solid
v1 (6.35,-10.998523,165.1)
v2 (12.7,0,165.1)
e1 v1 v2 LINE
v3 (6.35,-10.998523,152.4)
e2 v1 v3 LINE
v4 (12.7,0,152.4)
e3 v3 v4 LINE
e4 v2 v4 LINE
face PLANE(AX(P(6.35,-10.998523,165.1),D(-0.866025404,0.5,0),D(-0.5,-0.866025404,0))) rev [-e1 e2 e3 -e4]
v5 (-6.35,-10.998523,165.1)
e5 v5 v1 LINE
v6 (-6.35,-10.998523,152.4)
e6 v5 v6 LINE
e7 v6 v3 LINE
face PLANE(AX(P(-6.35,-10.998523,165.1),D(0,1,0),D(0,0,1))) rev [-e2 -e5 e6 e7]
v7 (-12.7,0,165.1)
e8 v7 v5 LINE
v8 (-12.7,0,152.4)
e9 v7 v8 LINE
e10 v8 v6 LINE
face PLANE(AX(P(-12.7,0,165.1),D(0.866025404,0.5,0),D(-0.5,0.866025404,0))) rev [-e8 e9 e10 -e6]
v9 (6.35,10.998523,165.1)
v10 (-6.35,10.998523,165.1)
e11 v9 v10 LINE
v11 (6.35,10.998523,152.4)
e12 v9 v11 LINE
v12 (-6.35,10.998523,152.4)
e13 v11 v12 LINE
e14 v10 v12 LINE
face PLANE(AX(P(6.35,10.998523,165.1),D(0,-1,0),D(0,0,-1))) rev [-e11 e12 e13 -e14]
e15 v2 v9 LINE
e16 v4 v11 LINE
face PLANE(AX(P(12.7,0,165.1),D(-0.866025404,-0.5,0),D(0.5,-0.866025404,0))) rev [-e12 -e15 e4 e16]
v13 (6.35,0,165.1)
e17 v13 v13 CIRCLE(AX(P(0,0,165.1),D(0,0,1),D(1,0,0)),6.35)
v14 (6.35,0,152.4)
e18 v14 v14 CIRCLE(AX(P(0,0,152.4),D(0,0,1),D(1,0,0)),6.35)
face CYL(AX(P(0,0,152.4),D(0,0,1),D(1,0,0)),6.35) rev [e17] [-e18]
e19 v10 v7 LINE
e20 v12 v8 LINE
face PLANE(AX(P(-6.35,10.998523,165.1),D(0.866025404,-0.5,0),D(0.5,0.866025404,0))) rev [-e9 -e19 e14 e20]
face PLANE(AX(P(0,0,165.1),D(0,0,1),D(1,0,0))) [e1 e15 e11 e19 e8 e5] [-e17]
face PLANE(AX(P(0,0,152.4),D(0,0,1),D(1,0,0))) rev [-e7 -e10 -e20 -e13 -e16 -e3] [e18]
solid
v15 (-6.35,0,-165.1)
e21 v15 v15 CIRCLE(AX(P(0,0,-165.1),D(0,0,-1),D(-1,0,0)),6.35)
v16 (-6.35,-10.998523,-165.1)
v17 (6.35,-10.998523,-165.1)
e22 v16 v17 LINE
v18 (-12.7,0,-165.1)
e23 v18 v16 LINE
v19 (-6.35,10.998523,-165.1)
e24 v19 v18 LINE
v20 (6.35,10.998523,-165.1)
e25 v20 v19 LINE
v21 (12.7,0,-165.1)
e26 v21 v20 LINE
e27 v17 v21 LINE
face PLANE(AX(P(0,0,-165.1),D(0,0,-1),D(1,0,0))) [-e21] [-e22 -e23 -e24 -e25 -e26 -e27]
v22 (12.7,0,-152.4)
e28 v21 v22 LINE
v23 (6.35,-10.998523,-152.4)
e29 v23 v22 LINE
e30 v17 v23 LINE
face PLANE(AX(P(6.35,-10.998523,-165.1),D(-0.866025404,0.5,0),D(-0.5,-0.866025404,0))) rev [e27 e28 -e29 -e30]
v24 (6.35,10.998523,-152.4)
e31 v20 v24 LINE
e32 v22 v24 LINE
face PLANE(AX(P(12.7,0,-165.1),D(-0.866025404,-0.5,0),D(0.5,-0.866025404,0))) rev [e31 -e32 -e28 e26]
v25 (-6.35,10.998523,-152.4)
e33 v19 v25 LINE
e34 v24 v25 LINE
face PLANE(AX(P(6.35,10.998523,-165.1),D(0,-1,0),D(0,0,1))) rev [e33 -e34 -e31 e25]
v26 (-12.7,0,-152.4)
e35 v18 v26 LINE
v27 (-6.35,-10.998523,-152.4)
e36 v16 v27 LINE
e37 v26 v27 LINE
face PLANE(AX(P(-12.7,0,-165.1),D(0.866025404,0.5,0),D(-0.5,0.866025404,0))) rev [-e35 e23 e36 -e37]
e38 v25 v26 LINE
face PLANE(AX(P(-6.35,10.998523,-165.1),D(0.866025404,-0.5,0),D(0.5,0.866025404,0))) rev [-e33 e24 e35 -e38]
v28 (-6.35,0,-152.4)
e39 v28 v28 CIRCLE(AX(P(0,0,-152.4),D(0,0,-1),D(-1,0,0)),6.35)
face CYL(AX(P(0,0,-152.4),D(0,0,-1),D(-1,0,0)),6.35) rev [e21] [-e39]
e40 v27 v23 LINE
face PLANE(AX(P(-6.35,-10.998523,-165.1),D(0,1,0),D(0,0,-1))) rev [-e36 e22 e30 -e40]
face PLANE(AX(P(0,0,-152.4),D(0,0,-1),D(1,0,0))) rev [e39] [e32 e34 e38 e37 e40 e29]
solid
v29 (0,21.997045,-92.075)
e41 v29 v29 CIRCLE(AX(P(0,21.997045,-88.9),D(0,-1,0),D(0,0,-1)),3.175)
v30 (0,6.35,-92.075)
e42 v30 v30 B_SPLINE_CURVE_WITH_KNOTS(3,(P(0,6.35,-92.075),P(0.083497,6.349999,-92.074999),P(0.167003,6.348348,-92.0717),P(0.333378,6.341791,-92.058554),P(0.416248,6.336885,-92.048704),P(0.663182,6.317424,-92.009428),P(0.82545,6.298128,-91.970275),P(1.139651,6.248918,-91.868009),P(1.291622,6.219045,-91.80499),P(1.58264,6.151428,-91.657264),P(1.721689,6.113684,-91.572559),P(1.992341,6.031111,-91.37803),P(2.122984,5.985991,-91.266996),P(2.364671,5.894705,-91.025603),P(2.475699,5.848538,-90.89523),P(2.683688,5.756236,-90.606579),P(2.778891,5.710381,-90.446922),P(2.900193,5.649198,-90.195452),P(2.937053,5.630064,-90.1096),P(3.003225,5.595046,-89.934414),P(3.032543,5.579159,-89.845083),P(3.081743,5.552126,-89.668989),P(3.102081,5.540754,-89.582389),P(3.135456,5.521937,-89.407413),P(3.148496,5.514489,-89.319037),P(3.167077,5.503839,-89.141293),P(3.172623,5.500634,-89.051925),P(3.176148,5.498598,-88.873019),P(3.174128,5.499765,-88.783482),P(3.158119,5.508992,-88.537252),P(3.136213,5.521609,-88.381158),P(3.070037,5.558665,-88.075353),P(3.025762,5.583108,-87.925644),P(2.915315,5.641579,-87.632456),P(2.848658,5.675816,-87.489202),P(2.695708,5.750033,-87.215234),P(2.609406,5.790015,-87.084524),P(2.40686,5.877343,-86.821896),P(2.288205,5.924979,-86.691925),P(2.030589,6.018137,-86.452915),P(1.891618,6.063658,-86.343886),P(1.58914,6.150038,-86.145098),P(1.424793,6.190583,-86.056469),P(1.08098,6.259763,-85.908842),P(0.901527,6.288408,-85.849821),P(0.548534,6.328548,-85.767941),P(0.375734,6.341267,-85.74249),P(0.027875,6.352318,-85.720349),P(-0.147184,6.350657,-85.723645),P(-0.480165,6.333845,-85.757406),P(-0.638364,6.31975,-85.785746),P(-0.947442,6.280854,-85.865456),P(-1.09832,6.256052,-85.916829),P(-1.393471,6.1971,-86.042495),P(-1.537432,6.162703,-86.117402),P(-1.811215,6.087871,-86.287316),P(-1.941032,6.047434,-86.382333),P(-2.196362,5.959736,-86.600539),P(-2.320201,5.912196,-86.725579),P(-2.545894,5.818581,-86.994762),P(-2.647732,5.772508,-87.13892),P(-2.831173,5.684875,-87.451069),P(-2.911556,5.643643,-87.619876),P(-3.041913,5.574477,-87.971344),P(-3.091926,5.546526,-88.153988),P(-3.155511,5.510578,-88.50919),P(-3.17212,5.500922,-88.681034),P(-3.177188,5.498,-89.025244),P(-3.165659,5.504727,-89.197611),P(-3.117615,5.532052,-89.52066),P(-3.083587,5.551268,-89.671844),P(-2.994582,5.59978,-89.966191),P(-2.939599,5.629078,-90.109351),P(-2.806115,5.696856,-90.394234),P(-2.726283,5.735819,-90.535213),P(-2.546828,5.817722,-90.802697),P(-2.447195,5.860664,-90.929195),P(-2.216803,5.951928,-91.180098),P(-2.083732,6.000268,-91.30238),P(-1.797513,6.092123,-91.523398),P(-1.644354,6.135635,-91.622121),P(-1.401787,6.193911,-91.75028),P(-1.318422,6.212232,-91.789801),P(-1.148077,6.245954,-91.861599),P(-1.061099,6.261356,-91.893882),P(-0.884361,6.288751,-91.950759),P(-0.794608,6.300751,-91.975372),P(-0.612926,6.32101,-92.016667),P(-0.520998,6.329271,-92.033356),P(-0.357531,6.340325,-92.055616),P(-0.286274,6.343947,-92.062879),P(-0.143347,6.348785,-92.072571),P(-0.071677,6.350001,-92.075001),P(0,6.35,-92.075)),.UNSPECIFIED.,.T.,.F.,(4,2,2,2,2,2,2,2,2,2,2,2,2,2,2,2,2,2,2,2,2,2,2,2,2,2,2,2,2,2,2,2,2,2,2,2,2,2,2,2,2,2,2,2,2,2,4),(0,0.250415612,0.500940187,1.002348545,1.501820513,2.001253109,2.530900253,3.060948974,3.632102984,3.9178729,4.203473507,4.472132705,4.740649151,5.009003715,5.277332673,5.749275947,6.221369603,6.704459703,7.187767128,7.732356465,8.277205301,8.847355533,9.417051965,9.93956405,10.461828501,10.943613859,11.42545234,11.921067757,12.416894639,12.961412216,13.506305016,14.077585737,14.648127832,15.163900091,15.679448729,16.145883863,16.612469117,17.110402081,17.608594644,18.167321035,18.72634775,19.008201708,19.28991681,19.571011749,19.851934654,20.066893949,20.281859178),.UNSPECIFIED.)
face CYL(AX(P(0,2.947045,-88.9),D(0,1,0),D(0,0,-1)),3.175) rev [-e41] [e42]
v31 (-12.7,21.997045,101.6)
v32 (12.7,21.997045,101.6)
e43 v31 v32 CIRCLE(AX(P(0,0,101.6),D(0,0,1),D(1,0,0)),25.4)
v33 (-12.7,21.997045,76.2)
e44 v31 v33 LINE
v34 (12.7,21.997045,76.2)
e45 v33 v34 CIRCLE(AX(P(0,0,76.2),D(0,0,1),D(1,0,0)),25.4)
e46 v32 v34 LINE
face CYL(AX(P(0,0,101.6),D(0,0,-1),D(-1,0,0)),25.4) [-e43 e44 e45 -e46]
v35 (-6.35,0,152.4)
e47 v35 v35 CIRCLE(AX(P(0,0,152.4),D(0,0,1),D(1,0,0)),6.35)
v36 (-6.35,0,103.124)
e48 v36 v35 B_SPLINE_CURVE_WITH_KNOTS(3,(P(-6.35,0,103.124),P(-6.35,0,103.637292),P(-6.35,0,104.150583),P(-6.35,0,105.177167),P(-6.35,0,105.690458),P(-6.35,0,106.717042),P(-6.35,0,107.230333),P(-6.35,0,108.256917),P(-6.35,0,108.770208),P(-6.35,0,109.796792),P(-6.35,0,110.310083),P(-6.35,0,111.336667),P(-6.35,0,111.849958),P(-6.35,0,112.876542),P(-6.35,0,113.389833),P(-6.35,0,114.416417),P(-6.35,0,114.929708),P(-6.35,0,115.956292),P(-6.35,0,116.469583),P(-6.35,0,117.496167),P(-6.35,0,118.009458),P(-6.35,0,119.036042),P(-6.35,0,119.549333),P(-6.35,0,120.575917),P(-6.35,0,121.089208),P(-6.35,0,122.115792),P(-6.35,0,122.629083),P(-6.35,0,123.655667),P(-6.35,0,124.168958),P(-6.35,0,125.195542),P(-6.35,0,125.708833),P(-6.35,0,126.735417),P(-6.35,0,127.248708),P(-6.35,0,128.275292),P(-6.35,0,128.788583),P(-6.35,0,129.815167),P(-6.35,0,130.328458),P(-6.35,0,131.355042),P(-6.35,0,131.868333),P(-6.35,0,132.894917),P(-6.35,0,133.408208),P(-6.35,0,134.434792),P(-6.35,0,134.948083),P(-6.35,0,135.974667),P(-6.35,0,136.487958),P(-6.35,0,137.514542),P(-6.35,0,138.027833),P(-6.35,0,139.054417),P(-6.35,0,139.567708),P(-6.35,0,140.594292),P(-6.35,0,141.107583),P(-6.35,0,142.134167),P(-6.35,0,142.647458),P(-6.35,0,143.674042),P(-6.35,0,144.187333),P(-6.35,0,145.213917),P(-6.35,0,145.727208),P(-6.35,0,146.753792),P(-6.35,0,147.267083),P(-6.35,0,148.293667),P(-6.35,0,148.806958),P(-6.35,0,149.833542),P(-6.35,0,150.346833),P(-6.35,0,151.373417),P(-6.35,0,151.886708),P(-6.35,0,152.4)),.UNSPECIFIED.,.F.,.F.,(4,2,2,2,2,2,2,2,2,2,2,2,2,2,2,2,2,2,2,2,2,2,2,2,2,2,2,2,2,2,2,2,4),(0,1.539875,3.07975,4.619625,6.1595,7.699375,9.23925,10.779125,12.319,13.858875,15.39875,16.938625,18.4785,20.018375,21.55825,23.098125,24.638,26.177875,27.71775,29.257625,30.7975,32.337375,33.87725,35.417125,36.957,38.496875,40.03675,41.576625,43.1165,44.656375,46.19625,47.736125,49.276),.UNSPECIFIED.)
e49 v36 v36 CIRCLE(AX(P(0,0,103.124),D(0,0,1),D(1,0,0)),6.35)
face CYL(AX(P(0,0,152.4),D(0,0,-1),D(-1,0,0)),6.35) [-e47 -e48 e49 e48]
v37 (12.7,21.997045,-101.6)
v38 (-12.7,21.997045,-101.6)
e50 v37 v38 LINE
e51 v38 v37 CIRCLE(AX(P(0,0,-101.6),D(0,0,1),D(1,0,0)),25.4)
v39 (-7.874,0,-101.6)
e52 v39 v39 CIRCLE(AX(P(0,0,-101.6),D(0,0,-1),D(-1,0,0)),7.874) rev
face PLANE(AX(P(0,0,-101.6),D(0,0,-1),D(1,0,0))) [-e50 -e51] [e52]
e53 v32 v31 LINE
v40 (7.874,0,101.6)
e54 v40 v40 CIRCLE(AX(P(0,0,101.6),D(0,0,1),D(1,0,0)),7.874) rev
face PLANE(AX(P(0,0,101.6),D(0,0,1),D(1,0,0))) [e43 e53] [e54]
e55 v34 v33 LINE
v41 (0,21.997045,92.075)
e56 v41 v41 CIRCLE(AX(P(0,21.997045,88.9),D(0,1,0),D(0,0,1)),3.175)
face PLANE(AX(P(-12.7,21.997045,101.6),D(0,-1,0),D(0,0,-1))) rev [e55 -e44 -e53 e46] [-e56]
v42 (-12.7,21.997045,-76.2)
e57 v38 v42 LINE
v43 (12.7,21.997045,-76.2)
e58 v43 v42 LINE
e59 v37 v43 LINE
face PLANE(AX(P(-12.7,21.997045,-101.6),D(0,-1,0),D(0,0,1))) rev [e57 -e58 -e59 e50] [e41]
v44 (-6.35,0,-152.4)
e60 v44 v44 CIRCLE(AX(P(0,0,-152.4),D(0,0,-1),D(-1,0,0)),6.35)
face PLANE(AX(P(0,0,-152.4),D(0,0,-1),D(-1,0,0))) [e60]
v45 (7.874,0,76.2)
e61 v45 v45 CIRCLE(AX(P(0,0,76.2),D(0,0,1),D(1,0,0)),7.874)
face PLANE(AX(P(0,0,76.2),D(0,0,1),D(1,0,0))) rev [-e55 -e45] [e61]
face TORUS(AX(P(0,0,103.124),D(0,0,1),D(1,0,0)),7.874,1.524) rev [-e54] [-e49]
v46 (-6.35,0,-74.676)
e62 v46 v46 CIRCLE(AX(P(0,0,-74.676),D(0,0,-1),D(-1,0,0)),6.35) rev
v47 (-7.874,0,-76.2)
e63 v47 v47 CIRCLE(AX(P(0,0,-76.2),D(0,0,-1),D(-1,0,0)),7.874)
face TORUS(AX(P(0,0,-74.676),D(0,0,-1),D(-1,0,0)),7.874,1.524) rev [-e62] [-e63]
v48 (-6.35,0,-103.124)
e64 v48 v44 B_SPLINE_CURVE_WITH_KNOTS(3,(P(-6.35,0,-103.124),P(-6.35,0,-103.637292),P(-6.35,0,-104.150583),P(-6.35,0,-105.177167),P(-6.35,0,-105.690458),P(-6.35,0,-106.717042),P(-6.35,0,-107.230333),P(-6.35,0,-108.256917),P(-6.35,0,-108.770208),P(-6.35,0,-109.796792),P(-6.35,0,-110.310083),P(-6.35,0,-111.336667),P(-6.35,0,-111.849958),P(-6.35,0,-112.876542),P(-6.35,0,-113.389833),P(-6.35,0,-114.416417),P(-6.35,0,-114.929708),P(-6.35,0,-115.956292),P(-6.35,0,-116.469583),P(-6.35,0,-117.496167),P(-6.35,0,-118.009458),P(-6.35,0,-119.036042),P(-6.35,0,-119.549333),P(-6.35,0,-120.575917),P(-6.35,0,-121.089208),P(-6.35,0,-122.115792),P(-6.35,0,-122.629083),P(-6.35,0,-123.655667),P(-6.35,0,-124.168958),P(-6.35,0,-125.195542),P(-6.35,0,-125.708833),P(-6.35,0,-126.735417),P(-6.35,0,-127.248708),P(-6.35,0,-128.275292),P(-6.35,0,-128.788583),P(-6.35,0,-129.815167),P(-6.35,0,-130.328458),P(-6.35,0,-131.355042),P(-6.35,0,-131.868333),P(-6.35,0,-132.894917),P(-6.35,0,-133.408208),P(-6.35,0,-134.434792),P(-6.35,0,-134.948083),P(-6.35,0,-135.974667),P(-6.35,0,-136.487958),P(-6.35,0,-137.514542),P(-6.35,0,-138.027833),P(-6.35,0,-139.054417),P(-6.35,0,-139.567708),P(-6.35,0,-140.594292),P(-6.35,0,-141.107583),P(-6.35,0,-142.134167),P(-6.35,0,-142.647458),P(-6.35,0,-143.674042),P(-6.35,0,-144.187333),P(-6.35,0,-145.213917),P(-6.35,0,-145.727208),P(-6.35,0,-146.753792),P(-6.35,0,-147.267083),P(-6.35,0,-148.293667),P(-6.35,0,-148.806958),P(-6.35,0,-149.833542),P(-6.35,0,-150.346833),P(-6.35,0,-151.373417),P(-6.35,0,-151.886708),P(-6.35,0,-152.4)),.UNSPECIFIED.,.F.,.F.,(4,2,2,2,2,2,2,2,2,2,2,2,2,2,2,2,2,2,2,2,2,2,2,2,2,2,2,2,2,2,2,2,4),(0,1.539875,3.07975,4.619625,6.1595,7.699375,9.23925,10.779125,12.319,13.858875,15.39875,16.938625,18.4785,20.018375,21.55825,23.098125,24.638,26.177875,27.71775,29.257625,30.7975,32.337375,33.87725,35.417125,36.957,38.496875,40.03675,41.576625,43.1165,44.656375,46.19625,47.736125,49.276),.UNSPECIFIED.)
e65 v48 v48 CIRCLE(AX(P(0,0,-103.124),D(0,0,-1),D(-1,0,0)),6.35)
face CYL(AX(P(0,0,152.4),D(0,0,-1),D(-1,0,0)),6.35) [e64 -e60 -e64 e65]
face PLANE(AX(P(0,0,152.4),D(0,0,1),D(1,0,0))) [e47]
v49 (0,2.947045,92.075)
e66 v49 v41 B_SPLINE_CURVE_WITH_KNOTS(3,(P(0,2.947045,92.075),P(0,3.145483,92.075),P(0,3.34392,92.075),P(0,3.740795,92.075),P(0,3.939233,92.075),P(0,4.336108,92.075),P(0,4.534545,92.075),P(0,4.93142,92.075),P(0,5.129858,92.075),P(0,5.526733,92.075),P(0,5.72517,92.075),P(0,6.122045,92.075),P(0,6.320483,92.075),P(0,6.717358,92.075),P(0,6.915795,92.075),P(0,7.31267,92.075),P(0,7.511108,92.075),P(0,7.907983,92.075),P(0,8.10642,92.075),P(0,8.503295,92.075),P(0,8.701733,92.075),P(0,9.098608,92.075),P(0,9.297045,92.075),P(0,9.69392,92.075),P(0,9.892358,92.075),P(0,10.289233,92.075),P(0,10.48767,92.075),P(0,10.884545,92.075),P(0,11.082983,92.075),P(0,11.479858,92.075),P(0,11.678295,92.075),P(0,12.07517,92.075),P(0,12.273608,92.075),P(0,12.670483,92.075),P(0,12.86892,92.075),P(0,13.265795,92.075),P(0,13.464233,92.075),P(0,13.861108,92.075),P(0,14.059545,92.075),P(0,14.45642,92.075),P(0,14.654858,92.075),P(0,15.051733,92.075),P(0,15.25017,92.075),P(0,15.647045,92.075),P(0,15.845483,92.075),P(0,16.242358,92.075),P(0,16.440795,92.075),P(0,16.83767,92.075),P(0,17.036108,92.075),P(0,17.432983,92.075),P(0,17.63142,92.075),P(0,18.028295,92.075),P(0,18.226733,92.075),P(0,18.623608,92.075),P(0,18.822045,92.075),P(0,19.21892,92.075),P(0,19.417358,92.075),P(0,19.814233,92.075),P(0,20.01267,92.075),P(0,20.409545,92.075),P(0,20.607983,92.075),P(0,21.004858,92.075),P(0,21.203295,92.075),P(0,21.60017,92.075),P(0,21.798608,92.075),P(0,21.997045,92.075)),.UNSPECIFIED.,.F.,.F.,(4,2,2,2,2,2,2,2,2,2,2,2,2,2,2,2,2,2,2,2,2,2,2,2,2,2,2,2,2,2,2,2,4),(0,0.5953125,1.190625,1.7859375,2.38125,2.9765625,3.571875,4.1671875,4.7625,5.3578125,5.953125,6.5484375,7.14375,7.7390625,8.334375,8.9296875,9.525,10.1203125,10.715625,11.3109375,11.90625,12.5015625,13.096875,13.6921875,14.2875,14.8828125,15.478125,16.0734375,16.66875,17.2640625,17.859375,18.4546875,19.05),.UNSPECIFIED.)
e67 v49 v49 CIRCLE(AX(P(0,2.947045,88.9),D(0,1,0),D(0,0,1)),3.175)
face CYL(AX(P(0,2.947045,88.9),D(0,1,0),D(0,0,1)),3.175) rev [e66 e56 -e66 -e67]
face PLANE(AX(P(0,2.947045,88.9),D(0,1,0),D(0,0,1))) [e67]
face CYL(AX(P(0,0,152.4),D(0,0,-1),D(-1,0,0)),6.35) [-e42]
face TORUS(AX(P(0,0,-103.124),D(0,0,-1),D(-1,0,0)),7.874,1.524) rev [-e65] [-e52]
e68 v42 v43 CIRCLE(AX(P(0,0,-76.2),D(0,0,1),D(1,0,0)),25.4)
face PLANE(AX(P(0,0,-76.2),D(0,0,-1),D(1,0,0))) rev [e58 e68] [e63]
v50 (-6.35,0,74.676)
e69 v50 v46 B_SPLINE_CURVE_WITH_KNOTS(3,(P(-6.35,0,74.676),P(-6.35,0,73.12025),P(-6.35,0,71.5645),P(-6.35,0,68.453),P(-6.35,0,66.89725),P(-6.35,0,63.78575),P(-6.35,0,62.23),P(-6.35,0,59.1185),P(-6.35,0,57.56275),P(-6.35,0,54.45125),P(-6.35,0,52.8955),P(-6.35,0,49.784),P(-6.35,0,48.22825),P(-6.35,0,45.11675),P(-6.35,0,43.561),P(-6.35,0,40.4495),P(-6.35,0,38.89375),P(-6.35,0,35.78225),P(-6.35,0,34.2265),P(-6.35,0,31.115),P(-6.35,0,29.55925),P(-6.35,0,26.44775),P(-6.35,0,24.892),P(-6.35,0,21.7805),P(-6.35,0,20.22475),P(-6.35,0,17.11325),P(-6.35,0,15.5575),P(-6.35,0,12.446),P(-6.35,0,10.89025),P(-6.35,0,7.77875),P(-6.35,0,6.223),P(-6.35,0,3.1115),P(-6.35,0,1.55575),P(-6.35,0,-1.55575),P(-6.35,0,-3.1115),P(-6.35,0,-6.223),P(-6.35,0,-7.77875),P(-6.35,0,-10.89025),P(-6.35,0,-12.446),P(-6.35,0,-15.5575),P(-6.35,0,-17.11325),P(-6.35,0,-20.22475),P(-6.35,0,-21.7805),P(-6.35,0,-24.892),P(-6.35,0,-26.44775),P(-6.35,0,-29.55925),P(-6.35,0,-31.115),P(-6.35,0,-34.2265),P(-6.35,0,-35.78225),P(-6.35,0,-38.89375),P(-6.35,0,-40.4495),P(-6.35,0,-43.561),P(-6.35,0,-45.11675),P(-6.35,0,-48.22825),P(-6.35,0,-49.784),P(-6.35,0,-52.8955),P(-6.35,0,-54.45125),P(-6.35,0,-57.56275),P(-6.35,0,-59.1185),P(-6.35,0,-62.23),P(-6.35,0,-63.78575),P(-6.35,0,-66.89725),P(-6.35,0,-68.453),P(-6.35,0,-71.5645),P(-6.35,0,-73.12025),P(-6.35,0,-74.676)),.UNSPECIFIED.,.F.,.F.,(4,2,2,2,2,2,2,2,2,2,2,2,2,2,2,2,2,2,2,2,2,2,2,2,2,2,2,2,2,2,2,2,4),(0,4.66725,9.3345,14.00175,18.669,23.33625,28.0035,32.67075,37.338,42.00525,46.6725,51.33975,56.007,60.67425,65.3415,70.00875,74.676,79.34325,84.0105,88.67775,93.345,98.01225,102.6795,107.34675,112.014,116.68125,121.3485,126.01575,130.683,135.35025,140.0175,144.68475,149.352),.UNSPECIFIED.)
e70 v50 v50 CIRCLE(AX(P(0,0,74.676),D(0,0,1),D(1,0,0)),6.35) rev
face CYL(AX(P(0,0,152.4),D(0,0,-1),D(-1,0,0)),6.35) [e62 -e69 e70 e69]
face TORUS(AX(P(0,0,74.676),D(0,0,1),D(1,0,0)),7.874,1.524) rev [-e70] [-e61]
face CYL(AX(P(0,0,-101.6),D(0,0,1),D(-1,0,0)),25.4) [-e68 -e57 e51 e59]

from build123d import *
from OCP.BRepAlgoAPI import BRepAlgoAPI_Cut
from OCP.TopTools import TopTools_ListOfShape

# Parameters (mm, degrees)
SKETCH1_R           = 6.35
BOSS_EXTRUDE1_DEPTH = 152.4
BOSS_EXTRUDE2_DEPTH = 12.7
SKETCH3_R           = 6.35
CUT_EXTRUDE1_DEPTH  = 12.7
BOSS_EXTRUDE3_DEPTH = 25.4
SKETCH5_R           = 3.175
CUT_EXTRUDE2_DEPTH  = 19.05
MIRROR1_START       = -101.6
MIRROR1_OUTLINE_R   = 6.35
MIRROR1_DEPTH       = 25.4
MIRROR1_START_2     = -165.1
MIRROR1_2_DEPTH     = 12.7
MIRROR1_START_3     = 5.499260123
MIRROR1_3_OUTLINE_R = 3.175
MIRROR1_3_DEPTH     = 16.497785133
MIRROR1_START_4     = -93
MIRROR1_4_DEPTH     = 7.275
FILLET1_R           = 1.524
SKETCH6_R           = 6.35
CUT_EXTRUDE5_DEPTH  = 12.7


with BuildPart() as part:
    # Sketch1 → Boss-Extrude1 (new, symmetric)
    with BuildSketch(Plane.XY):
        with Locations(Location((0, 0, 0), (0, 0, 180))):
            Circle(SKETCH1_R)
    extrude(amount=BOSS_EXTRUDE1_DEPTH, both=True)

    # Sketch2 → Boss-Extrude2 (add)
    with BuildSketch(Plane.XY.offset(152.4)):
        Polygon((6.35, -10.998522628), (12.7, 0), (6.35, 10.998522628), (-6.35, 10.998522628), (-12.7, 0), (-6.35, -10.998522628), align=None)
    extrude(amount=BOSS_EXTRUDE2_DEPTH)

    # Sketch3 → Cut-Extrude1 (cut)
    with BuildSketch(Plane.XY.offset(165.1)):
        with Locations(Location((0, 0, 0), (0, 0, 180))):
            Circle(SKETCH3_R)
    extrude(amount=-CUT_EXTRUDE1_DEPTH, mode=Mode.SUBTRACT)


with BuildPart() as cut_extrude1_piece_1:
    # of the separate pieces the step leaves, piece 1, a body of its own (cut_extrude1_pieces)
    add(part.part.solids().sort_by_distance((-6.35, 0, -152.4))[0])

    # Sketch4 → Boss-Extrude3 (add)
    with BuildSketch(Plane.XY.offset(76.2)):
        with BuildLine():
            Line((-12.7, 21.997045256), (12.7, 21.997045256))
            ThreePointArc((12.7, 21.997045256), (0, -25.4), (-12.7, 21.997045256))
        make_face()
    extrude(amount=BOSS_EXTRUDE3_DEPTH)

    # Sketch5 → Cut-Extrude2 (cut)
    with BuildSketch(Plane(origin=(0, 21.997045256, 0), x_dir=(1, 0, 0), z_dir=(0, 1, 0))):
        with Locations(Location((0, -88.9, 0), (0, 0, 270))):
            Circle(SKETCH5_R)
    extrude(amount=-CUT_EXTRUDE2_DEPTH, mode=Mode.SUBTRACT)


with BuildPart() as cut_extrude1_piece_2:
    # of the separate pieces the step leaves, piece 2, a body of its own (cut_extrude1_pieces)
    add(part.part.solids().sort_by_distance((6.35, -10.998522628, 152.4))[0])


with BuildPart() as mirror1_tool:
    # Mirror1: read off the stored shape, not the designer's step
    # Mirror1 outline → Mirror1 (new body)
    with BuildSketch(Plane.XY.offset(MIRROR1_START)):
        with BuildLine():
            Line((12.7, 21.997045256), (-12.7, 21.997045256))
            ThreePointArc((-12.7, 21.997045256), (0, -25.4), (12.7, 21.997045256))
        make_face()
        Circle(MIRROR1_OUTLINE_R, mode=Mode.SUBTRACT)
    extrude(amount=MIRROR1_DEPTH)


with BuildPart() as cut_extrude1_piece_1_1:
    add(cut_extrude1_piece_1.part)


with BuildPart() as cut_extrude1_piece_1_2:
    # Mirror1: joined with mirror1_tool
    add(cut_extrude1_piece_1_1.part.fuse(mirror1_tool.part, tol=0.00001))


with BuildPart() as mirror1_2_tool:
    # Mirror1 2 outline → Mirror1 2 (new body)
    with BuildSketch(Plane.XY.offset(MIRROR1_START_2)):
        Polygon((-12.7, 0), (-6.35, -10.998522628), (6.35, -10.998522628), (12.7, 0), (6.35, 10.998522628), (-6.35, 10.998522628), align=None)
    extrude(amount=MIRROR1_2_DEPTH)


with BuildPart() as cut_extrude1_piece_1_3:
    add(cut_extrude1_piece_1_2.part)


with BuildPart() as cut_extrude1_piece_1_4:
    # Mirror1 2: joined with mirror1_2_tool
    add(cut_extrude1_piece_1_3.part.fuse(mirror1_2_tool.part, tol=0.00001))


with BuildPart() as mirror1_3_tool:
    # Mirror1 3 outline → Mirror1 3 (new body)
    with BuildSketch(Plane(origin=(0, 0, 0), x_dir=(1, 0, 0), z_dir=(0, 1, 0)).offset(MIRROR1_START_3)):
        with Locations((0, 88.9)):
            Circle(MIRROR1_3_OUTLINE_R)
    extrude(amount=MIRROR1_3_DEPTH)


with BuildPart() as cut_extrude1_piece_1_5:
    add(cut_extrude1_piece_1_4.part)

    # Mirror1 3: cut by mirror1_3_tool, with a tolerance
    mirror1_3_stock = TopTools_ListOfShape()
    mirror1_3_stock.Append(cut_extrude1_piece_1_5.part.wrapped)
    mirror1_3_tools = TopTools_ListOfShape()
    mirror1_3_tools.Append(mirror1_3_tool.part.wrapped)
    mirror1_3_cut = BRepAlgoAPI_Cut()
    mirror1_3_cut.SetArguments(mirror1_3_stock)
    mirror1_3_cut.SetTools(mirror1_3_tools)
    mirror1_3_cut.SetFuzzyValue(0.00001)
    mirror1_3_cut.Build()
    add(Compound.cast(mirror1_3_cut.Shape()).solids(), mode=Mode.REPLACE)


with BuildPart() as mirror1_4_tool:
    # Mirror1 4 outline → Mirror1 4 (new body)
    with BuildSketch(Plane.XY.offset(MIRROR1_START_4)):
        with BuildLine():
            ThreePointArc((3.175000516, 5.499261016), (0, 6.35), (-3.175000515, 5.499261016))
            Line((-3.175000515, 5.499261016), (3.175000516, 5.499261016))
        make_face()
    extrude(amount=MIRROR1_4_DEPTH)


with BuildPart() as cut_extrude1_piece_1_6:
    add(cut_extrude1_piece_1_5.part)


with BuildPart() as cut_extrude1_piece_1_7:
    # Mirror1 4: joined with mirror1_4_tool
    add(cut_extrude1_piece_1_6.part.fuse(mirror1_4_tool.part, tol=0.00001))

    # Fillet1
    fillet1_edges = [cut_extrude1_piece_1_7.edges().sort_by_distance(p)[0] for p in [
        (6.35, 0, -76.2),
        (6.35, 0, -101.6),
        (6.35, 0, 76.2),
        (6.35, 0, 101.6),
    ]]
    fillet(fillet1_edges, radius=FILLET1_R)

    # Sketch6 → Cut-Extrude5 (cut)
    with BuildSketch(Plane(origin=(0, 0, -165.1), x_dir=(-1, 0, 0), z_dir=(0, 0, -1))):
        Circle(SKETCH6_R)
    extrude(amount=-CUT_EXTRUDE5_DEPTH, mode=Mode.SUBTRACT)


with BuildPart() as cut_extrude5_piece_1:
    # of the separate pieces the step leaves, piece 1, a body of its own (cut_extrude5_pieces)
    add(cut_extrude1_piece_1_7.part.solids().sort_by_distance((-6.35, 0, -103.124))[0])


with BuildPart() as cut_extrude5_piece_2:
    # of the separate pieces the step leaves, piece 2, a body of its own (cut_extrude5_pieces)
    add(cut_extrude1_piece_1_7.part.solids().sort_by_distance((-12.7, 0, -152.4))[0])


solid = Compound([cut_extrude1_piece_2.part, cut_extrude5_piece_1.part, cut_extrude5_piece_2.part])
